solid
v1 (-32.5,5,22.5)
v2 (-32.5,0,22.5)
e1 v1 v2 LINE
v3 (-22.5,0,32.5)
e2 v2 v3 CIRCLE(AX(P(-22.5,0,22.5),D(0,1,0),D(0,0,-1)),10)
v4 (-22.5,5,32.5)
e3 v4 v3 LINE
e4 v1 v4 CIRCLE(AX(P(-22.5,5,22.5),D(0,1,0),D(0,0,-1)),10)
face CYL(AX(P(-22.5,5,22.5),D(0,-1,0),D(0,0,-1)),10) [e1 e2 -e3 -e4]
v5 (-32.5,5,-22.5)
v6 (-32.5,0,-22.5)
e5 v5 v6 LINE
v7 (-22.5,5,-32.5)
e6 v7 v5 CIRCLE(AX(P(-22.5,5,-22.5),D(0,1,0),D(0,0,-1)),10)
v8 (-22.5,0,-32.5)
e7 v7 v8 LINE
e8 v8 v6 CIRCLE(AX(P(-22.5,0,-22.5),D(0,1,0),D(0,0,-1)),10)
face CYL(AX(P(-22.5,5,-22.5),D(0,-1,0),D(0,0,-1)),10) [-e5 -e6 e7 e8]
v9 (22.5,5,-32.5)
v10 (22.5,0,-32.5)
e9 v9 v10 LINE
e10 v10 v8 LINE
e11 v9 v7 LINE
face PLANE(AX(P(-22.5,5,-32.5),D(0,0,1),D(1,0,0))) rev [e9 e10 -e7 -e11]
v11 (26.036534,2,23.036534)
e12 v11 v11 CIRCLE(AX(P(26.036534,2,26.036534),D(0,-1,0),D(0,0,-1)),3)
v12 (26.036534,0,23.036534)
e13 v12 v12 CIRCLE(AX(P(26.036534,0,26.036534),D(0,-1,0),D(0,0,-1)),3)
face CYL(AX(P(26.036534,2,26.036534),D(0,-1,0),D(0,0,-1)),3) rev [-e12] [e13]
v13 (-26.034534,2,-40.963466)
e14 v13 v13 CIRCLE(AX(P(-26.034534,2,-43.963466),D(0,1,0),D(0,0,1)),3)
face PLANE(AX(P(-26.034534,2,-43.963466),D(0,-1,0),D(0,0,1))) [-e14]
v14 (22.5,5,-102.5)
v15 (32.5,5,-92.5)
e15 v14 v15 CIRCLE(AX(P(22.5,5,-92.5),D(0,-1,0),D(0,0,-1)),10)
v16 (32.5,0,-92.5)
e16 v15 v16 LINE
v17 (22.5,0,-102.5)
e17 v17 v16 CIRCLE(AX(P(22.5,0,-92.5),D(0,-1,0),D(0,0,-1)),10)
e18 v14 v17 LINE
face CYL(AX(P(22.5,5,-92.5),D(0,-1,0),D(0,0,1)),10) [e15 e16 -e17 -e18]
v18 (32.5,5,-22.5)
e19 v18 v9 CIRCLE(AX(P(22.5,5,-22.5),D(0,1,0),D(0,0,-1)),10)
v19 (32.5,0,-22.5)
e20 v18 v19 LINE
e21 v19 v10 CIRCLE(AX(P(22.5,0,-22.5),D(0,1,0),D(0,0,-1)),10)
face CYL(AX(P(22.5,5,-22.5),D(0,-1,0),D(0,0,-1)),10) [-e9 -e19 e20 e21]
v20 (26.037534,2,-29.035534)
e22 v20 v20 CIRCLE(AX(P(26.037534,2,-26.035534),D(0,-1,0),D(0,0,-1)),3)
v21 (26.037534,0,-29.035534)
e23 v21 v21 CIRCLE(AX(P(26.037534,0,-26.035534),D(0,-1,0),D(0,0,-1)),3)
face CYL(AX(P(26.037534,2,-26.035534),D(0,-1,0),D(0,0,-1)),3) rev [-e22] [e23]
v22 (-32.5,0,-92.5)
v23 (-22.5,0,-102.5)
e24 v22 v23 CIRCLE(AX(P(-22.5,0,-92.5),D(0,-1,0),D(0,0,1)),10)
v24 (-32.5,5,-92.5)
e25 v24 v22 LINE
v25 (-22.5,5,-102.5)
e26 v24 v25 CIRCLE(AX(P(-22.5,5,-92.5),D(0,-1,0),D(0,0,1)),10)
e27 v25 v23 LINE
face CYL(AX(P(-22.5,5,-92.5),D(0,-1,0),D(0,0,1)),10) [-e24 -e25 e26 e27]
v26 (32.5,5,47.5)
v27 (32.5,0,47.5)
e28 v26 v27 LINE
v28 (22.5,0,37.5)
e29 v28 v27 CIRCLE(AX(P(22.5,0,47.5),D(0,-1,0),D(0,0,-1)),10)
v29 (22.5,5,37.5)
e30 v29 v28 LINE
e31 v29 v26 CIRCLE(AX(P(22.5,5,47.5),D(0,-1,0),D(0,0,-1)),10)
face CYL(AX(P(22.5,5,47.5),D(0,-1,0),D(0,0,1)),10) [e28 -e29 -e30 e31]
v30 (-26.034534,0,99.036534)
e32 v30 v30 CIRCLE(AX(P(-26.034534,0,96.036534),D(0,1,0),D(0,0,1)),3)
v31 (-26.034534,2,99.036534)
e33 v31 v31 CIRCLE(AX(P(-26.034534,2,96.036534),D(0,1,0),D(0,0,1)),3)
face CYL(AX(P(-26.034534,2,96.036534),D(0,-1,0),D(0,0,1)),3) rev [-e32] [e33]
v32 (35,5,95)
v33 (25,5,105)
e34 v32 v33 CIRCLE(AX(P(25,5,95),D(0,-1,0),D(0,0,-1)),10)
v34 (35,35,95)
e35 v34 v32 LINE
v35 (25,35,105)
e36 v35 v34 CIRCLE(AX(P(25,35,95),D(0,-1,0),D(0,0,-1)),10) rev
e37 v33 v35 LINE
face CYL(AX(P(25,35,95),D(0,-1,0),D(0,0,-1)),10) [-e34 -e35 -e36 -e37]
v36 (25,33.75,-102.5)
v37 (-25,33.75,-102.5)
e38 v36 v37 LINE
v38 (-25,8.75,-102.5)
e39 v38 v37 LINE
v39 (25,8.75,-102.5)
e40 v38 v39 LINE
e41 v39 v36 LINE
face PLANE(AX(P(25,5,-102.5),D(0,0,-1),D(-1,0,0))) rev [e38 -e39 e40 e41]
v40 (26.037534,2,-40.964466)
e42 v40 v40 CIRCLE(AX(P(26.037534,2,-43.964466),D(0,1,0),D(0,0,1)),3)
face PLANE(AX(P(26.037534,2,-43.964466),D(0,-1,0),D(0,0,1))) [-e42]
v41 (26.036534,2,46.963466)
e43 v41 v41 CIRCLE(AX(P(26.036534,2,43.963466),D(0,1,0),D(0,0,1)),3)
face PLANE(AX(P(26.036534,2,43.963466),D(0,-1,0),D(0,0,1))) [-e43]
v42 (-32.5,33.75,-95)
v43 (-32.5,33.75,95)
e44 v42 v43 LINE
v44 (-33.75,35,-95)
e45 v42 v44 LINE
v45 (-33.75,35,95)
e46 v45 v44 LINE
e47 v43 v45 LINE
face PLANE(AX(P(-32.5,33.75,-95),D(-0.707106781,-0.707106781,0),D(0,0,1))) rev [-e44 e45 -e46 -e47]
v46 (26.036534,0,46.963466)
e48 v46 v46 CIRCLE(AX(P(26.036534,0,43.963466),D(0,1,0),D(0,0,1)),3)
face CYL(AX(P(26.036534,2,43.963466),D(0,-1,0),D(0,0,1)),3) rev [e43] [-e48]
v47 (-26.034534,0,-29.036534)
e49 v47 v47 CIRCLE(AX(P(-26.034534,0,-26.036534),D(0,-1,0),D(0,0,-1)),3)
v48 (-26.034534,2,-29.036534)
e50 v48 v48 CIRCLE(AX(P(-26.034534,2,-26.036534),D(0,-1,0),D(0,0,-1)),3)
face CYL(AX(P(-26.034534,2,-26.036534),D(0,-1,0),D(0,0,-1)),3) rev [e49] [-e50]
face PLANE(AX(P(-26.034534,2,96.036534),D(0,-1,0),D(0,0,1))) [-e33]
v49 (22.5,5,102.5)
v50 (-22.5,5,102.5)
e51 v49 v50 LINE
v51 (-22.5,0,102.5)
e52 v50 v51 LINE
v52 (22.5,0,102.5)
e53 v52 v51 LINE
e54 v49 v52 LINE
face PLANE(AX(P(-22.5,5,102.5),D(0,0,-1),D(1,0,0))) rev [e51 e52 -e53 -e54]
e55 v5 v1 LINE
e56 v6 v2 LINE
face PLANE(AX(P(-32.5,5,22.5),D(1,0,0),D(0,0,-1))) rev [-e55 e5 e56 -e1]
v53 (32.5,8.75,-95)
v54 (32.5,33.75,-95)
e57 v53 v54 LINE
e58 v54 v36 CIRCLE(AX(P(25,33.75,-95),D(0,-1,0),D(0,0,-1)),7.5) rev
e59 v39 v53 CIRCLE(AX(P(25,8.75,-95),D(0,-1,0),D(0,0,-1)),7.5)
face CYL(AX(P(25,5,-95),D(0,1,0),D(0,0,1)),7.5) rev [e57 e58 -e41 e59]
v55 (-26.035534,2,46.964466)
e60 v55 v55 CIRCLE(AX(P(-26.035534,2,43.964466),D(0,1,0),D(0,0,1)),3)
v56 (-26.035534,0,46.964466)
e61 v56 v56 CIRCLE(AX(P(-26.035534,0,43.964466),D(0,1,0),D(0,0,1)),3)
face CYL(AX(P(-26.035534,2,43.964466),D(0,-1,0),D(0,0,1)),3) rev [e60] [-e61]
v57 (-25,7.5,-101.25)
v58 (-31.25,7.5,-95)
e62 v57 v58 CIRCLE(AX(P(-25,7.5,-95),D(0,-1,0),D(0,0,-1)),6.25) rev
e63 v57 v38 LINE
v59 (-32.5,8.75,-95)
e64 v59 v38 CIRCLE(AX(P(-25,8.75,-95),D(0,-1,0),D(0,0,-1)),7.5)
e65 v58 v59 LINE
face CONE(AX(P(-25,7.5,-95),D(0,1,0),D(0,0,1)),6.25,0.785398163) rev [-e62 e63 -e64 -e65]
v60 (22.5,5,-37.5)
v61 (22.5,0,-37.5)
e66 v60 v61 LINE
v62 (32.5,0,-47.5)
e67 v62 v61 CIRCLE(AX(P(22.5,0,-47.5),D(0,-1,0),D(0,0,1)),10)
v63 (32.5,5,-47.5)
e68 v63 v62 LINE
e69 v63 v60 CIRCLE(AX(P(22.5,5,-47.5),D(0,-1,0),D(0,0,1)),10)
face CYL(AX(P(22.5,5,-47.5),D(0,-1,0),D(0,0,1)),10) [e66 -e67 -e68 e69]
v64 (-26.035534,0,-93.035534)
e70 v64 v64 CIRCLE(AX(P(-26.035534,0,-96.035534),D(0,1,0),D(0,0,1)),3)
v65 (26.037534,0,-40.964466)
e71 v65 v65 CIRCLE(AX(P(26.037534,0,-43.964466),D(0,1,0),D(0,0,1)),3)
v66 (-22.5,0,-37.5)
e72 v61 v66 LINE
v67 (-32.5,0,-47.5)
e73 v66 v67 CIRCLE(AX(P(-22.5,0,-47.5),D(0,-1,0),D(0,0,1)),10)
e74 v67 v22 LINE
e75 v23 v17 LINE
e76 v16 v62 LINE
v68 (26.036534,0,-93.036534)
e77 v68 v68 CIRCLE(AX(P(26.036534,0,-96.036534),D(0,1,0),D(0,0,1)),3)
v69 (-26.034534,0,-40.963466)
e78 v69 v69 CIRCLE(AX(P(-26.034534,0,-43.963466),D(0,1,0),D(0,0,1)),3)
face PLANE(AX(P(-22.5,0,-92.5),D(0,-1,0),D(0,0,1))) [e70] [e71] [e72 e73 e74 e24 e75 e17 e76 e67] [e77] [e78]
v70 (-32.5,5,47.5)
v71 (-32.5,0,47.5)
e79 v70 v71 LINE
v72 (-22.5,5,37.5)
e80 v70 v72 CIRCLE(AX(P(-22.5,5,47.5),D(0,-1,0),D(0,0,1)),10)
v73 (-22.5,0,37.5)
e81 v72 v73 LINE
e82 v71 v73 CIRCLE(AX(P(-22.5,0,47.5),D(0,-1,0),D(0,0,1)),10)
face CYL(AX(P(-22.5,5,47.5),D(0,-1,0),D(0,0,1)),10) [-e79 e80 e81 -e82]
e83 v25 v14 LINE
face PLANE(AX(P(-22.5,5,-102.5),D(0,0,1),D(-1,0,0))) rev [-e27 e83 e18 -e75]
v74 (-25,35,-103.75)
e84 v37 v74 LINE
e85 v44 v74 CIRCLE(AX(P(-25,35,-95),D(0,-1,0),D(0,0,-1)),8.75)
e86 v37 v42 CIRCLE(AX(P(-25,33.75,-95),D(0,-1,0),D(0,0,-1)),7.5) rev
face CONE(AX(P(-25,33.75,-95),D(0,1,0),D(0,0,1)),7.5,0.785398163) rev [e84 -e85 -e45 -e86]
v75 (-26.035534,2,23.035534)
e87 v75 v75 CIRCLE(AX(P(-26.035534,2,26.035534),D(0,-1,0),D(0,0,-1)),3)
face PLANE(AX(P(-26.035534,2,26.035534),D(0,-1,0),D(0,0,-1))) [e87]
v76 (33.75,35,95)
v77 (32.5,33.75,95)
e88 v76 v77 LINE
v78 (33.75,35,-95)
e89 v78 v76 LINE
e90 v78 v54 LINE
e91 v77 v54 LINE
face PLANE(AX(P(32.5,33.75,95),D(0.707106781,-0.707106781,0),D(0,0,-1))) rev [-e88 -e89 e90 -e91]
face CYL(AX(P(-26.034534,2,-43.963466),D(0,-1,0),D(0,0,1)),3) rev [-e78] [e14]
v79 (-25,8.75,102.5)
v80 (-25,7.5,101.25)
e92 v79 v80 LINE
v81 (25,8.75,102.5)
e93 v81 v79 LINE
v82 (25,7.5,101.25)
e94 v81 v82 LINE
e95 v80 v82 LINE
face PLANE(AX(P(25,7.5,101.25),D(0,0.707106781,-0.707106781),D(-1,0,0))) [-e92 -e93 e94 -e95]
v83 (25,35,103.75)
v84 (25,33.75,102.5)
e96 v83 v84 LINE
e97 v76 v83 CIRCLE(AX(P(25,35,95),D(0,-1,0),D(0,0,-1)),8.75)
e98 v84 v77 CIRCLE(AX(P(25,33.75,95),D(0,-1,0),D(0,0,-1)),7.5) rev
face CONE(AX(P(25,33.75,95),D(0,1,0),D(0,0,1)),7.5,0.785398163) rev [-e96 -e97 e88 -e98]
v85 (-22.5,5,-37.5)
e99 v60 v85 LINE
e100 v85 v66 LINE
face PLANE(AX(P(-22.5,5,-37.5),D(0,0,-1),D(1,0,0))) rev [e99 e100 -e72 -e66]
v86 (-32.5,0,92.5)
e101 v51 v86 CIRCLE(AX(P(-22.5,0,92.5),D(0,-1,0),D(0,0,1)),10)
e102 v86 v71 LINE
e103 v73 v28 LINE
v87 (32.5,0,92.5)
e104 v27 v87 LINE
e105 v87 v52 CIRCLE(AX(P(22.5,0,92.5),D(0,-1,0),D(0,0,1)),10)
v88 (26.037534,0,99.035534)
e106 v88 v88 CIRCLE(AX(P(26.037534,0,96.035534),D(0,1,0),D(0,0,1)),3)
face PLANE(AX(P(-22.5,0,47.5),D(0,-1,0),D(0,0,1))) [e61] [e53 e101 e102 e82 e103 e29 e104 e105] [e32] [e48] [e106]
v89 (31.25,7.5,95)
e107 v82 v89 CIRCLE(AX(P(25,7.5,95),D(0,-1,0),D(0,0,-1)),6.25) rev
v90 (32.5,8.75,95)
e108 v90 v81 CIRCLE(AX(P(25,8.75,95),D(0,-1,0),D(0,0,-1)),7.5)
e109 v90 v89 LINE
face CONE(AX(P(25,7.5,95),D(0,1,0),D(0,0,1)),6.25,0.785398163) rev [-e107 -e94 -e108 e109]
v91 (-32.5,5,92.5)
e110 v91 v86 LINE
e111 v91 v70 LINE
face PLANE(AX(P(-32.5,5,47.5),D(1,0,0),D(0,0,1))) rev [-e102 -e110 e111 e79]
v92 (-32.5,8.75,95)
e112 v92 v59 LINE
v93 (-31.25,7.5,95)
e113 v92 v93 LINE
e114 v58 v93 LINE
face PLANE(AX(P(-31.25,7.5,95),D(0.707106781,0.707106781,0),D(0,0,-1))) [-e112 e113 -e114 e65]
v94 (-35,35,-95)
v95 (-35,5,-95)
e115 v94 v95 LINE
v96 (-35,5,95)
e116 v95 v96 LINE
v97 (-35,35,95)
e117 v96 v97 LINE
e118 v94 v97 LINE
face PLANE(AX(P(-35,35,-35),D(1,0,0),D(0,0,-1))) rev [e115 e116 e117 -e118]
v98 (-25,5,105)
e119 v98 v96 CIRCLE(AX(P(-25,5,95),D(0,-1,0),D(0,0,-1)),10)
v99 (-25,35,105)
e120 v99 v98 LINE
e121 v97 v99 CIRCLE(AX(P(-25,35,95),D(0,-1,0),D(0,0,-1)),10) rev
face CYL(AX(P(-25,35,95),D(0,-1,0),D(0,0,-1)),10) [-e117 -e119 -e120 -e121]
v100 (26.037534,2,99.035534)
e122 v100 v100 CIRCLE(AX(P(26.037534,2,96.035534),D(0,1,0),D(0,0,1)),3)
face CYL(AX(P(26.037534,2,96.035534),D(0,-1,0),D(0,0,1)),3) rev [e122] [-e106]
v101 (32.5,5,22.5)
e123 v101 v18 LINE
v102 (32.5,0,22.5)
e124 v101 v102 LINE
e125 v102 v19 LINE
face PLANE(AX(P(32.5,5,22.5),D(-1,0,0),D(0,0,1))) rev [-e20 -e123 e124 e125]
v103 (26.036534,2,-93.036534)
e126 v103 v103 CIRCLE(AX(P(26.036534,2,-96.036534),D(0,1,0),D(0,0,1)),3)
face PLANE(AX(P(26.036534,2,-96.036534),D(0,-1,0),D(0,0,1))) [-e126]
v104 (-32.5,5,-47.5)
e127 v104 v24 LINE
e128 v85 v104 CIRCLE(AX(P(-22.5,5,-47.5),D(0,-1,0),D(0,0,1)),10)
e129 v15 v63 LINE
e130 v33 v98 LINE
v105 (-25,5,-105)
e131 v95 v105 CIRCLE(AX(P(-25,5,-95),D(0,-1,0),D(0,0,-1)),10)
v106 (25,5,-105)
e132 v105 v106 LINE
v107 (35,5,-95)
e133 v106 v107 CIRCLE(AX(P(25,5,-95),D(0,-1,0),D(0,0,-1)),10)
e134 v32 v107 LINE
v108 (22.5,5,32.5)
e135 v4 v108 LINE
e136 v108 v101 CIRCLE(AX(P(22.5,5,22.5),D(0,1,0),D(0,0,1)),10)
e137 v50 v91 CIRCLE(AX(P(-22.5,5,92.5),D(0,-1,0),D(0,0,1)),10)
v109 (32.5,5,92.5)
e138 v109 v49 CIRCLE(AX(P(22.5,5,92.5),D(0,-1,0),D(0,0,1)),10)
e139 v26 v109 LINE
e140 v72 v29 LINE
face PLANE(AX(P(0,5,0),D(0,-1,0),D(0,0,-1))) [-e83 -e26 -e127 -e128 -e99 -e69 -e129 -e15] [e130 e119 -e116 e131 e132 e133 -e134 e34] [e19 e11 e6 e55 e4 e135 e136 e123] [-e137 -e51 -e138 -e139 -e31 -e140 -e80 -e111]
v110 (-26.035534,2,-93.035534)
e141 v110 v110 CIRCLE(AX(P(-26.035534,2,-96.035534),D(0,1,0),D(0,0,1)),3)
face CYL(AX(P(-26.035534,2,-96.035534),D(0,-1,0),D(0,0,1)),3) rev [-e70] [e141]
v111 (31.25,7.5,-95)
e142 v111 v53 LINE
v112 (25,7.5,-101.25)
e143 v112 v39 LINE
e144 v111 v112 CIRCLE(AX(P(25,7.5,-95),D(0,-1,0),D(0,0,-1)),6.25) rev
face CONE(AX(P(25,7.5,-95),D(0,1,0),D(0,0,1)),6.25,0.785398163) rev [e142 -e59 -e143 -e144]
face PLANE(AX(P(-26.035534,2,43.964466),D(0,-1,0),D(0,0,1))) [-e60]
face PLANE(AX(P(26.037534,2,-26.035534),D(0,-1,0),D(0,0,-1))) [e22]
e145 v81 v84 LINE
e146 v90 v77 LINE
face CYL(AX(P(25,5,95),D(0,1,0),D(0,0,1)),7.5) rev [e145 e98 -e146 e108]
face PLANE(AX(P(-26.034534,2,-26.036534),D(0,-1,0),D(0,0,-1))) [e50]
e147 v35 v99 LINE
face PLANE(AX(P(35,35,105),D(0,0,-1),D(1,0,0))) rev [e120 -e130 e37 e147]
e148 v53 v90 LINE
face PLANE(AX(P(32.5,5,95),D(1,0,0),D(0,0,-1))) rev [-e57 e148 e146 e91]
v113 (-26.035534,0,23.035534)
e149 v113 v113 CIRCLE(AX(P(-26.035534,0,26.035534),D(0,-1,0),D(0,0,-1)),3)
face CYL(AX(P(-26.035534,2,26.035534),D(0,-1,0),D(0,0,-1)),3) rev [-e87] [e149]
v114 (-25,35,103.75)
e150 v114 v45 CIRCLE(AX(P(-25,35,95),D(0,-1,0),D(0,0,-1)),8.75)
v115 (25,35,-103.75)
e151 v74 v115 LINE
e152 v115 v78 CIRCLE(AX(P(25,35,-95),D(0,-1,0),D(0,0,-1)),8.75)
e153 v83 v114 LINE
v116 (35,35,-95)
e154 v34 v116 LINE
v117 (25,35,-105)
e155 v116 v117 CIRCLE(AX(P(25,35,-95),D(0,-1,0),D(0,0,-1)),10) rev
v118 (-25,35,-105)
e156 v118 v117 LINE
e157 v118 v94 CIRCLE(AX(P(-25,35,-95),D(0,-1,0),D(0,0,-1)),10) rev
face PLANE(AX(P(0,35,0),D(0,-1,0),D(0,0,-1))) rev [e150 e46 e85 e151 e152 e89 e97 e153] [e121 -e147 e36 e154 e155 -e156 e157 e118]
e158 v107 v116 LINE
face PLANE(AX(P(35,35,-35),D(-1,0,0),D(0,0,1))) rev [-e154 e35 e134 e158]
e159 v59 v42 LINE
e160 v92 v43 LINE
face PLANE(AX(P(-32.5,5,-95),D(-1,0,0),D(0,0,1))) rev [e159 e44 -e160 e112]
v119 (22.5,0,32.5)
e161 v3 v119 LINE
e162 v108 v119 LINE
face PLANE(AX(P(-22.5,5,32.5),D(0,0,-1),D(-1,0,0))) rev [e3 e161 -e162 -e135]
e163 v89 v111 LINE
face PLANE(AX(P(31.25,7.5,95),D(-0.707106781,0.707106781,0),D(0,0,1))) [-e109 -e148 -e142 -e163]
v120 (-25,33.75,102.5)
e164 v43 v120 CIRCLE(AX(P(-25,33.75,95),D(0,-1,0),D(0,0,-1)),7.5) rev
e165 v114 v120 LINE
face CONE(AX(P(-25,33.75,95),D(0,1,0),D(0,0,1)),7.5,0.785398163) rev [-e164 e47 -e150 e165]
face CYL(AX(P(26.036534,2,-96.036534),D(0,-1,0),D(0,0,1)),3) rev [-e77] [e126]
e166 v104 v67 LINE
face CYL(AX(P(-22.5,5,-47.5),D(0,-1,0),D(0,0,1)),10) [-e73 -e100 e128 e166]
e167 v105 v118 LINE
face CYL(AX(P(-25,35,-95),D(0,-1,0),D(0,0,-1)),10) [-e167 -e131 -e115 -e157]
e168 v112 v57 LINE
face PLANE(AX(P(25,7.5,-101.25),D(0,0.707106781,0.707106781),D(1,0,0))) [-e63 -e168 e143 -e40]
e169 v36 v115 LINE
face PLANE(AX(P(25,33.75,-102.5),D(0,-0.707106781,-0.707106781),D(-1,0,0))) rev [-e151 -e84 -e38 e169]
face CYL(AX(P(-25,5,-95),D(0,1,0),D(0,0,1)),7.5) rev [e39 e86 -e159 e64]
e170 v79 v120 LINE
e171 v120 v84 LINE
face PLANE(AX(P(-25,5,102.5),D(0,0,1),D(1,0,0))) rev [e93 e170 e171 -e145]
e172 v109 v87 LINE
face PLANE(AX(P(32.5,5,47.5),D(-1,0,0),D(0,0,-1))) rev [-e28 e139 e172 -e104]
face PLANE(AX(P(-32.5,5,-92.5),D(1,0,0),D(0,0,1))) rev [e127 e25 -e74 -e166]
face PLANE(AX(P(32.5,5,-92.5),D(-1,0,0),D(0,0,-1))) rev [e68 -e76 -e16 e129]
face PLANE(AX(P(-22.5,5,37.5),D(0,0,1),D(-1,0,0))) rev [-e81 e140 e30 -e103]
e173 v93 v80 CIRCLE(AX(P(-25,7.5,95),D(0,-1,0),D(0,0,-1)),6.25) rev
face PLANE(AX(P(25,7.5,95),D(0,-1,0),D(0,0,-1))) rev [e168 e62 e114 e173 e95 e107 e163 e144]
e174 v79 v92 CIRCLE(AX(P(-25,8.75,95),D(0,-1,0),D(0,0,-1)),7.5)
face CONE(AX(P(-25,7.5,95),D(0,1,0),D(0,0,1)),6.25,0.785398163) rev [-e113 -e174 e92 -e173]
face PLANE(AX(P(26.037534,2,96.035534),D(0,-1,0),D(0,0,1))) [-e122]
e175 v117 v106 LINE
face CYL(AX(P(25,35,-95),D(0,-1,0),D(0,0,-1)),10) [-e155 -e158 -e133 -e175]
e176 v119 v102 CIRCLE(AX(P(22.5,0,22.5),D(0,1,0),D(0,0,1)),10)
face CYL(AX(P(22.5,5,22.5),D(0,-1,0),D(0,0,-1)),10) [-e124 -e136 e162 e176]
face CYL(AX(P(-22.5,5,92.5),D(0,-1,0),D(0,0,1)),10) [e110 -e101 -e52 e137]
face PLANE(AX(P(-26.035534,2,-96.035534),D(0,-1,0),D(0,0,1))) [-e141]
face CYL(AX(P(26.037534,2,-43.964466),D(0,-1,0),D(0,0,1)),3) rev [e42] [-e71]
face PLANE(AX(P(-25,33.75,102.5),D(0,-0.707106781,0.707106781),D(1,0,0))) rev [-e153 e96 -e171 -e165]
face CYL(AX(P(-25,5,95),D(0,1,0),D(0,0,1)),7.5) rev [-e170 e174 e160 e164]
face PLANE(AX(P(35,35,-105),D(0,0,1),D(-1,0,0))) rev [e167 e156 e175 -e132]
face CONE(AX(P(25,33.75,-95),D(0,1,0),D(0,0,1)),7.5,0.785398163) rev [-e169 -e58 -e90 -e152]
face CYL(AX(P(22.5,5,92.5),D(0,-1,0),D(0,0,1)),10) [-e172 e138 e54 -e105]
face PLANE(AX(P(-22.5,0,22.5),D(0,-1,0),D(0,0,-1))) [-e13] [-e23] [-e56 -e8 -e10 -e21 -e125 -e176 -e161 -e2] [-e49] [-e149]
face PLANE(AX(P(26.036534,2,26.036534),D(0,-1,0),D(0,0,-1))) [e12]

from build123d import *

# Parameters (mm, degrees)
BOSS_EXTRUDE4_DEPTH = 5
SKETCH7_R           = 3
CUT_EXTRUDE4_DEPTH  = 2
SKETCH8_W           = 70
SKETCH8_H           = 70
BOSS_EXTRUDE5_DEPTH = 30
MIRROR2_START       = 5
MIRROR2_OUTLINE_W   = 70
MIRROR2_OUTLINE_H   = 70
MIRROR2_DEPTH       = 30
MIRROR2_2_OUTLINE_R = 3
MIRROR2_2_DEPTH     = 5
MIRROR2_START_2     = 2
MIRROR2_3_OUTLINE_R = 3
MIRROR2_3_DEPTH     = 3
FILLET1_R           = 10
CUT_EXTRUDE5_DEPTH  = 30
BOSS_EXTRUDE6_DEPTH = 2.5
CHAMFER1_SIZE       = 1.25


# Read off the part's stored shape, not the designer's step: Mirror2
with BuildPart() as part:
    # Sketch5 → Boss-Extrude4 (new body)
    with BuildSketch(Plane(origin=(0, 0, 0), x_dir=(1, 0, 0), z_dir=(0, 1, 0))):
        with BuildLine():
            Line((-22.5, -32.5), (22.5, -32.5))
            ThreePointArc((22.5, -32.5), (29.571067812, -29.571067812), (32.5, -22.5))
            Line((32.5, -22.5), (32.5, 22.5))
            ThreePointArc((32.5, 22.5), (29.571067812, 29.571067812), (22.5, 32.5))
            Line((22.5, 32.5), (-22.5, 32.5))
            ThreePointArc((-22.5, 32.5), (-29.571067812, 29.571067812), (-32.5, 22.5))
            Line((-32.5, 22.5), (-32.5, -22.5))
            ThreePointArc((-32.5, -22.5), (-29.571067812, -29.571067812), (-22.5, -32.5))
        make_face()
    extrude(amount=BOSS_EXTRUDE4_DEPTH)

    # Sketch7 → Cut-Extrude4 (cut)
    with BuildSketch(Plane.XZ):
        with Locations(Location((-26.035533906, 26.035533906, 0), (0, 0, 270))):
            Circle(SKETCH7_R)
        with Locations(Location((26.036533906, 26.036533906, 0), (0, 0, 270))):
            Circle(SKETCH7_R)
        with Locations(Location((26.037533906, -26.035533906, 0), (0, 0, 270))):
            Circle(SKETCH7_R)
        with Locations(Location((-26.034533906, -26.036533906, 0), (0, 0, 270))):
            Circle(SKETCH7_R)
    extrude(amount=-CUT_EXTRUDE4_DEPTH, mode=Mode.SUBTRACT)

    # Sketch8 → Boss-Extrude5 (add)
    with BuildSketch(Plane(origin=(0, 5, 0), x_dir=(1, 0, 0), z_dir=(0, 1, 0))):
        Rectangle(SKETCH8_W, SKETCH8_H)
    extrude(amount=BOSS_EXTRUDE5_DEPTH)

    # Mirror2 outline → Mirror2 (add)
    with BuildSketch(Plane(origin=(0, 0, 0), x_dir=(1, 0, 0), z_dir=(0, 1, 0)).offset(MIRROR2_START)):
        with Locations((0, -70)):
            Rectangle(MIRROR2_OUTLINE_W, MIRROR2_OUTLINE_H)
        with Locations((0, 70)):
            Rectangle(MIRROR2_OUTLINE_W, MIRROR2_OUTLINE_H)
    extrude(amount=MIRROR2_DEPTH)

    # Mirror2 2 outline → Mirror2 2 (add)
    # profile 1 of 2: a face of its own
    with BuildSketch(Plane(origin=(0, 0, 0), x_dir=(1, 0, 0), z_dir=(0, 1, 0))):
        with BuildLine():
            Line((32.5, -92.5), (32.5, -47.5))
            ThreePointArc((32.5, -47.5), (29.571067812, -40.428932188), (22.5, -37.5))
            Line((22.5, -37.5), (-22.5, -37.5))
            ThreePointArc((-22.5, -37.5), (-29.571067812, -40.428932188), (-32.5, -47.5))
            Line((-32.5, -47.5), (-32.5, -92.5))
            ThreePointArc((-32.5, -92.5), (-29.571067812, -99.571067812), (-22.5, -102.5))
            Line((-22.5, -102.5), (22.5, -102.5))
            ThreePointArc((22.5, -102.5), (29.571067812, -99.571067812), (32.5, -92.5))
        make_face()
        with Locations((-26.034533906, -96.036533906)):
            Circle(MIRROR2_2_OUTLINE_R, mode=Mode.SUBTRACT)
        with Locations((-26.035533906, -43.964466094)):
            Circle(MIRROR2_2_OUTLINE_R, mode=Mode.SUBTRACT)
        with Locations((26.037533906, -96.035533906)):
            Circle(MIRROR2_2_OUTLINE_R, mode=Mode.SUBTRACT)
        with Locations((26.036533906, -43.963466094)):
            Circle(MIRROR2_2_OUTLINE_R, mode=Mode.SUBTRACT)
    # profile 2 of 2: a face of its own
    with BuildSketch(Plane(origin=(0, 0, 0), x_dir=(1, 0, 0), z_dir=(0, 1, 0))):
        with BuildLine():
            Line((32.5, 47.5), (32.5, 92.5))
            ThreePointArc((32.5, 92.5), (29.571067812, 99.571067812), (22.5, 102.5))
            Line((22.5, 102.5), (-22.5, 102.5))
            ThreePointArc((-22.5, 102.5), (-29.571067812, 99.571067812), (-32.5, 92.5))
            Line((-32.5, 92.5), (-32.5, 47.5))
            ThreePointArc((-32.5, 47.5), (-29.571067812, 40.428932188), (-22.5, 37.5))
            Line((-22.5, 37.5), (22.5, 37.5))
            ThreePointArc((22.5, 37.5), (29.571067812, 40.428932188), (32.5, 47.5))
        make_face()
        with Locations((-26.034533906, 43.963466094)):
            Circle(MIRROR2_2_OUTLINE_R, mode=Mode.SUBTRACT)
        with Locations((-26.035533906, 96.035533906)):
            Circle(MIRROR2_2_OUTLINE_R, mode=Mode.SUBTRACT)
        with Locations((26.037533906, 43.964466094)):
            Circle(MIRROR2_2_OUTLINE_R, mode=Mode.SUBTRACT)
        with Locations((26.036533906, 96.036533906)):
            Circle(MIRROR2_2_OUTLINE_R, mode=Mode.SUBTRACT)
    extrude(amount=MIRROR2_2_DEPTH)

    # Mirror2 3 outline → Mirror2 3 (add)
    with BuildSketch(Plane(origin=(0, 0, 0), x_dir=(1, 0, 0), z_dir=(0, 1, 0)).offset(MIRROR2_START_2)):
        with Locations((-26.035533906, -43.964466094)):
            Circle(MIRROR2_3_OUTLINE_R)
        with Locations((26.036533906, -43.963466094)):
            Circle(MIRROR2_3_OUTLINE_R)
        with Locations((26.037533906, -96.035533906)):
            Circle(MIRROR2_3_OUTLINE_R)
        with Locations((-26.034533906, -96.036533906)):
            Circle(MIRROR2_3_OUTLINE_R)
        with Locations((-26.035533906, 96.035533906)):
            Circle(MIRROR2_3_OUTLINE_R)
        with Locations((26.036533906, 96.036533906)):
            Circle(MIRROR2_3_OUTLINE_R)
        with Locations((26.037533906, 43.964466094)):
            Circle(MIRROR2_3_OUTLINE_R)
        with Locations((-26.034533906, 43.963466094)):
            Circle(MIRROR2_3_OUTLINE_R)
    extrude(amount=MIRROR2_3_DEPTH)

    # Fillet1
    fillet1_edges = [part.edges().sort_by_distance(p)[0] for p in [
        (35, 20, 105),
        (-35, 20, 105),
        (-35, 20, -105),
        (35, 20, -105),
    ]]
    fillet(fillet1_edges, radius=FILLET1_R)

    # Sketch9 → Cut-Extrude5 (cut)
    with BuildSketch(Plane(origin=(0, 35, 0), x_dir=(1, 0, 0), z_dir=(0, 1, 0))):
        with BuildLine():
            Line((-32.5, 95), (-32.5, -95))
            ThreePointArc((-32.5, -95), (-30.303300859, -100.303300859), (-25, -102.5))
            Line((-25, -102.5), (25, -102.5))
            ThreePointArc((25, -102.5), (30.303300859, -100.303300859), (32.5, -95))
            Line((32.5, -95), (32.5, 95))
            ThreePointArc((32.5, 95), (30.303300859, 100.303300859), (25, 102.5))
            Line((25, 102.5), (-25, 102.5))
            ThreePointArc((-25, 102.5), (-30.303300859, 100.303300859), (-32.5, 95))
        make_face()
    extrude(amount=-CUT_EXTRUDE5_DEPTH, mode=Mode.SUBTRACT)


with BuildPart() as cut_extrude5_piece_1:
    # of the separate pieces the step leaves, piece 1, a body of its own (cut_extrude5_pieces)
    add(part.part.solids().sort_by_distance((35, 5, 95))[0])



with BuildPart() as cut_extrude5_piece_2:
    # of the separate pieces the step leaves, piece 2, a body of its own (cut_extrude5_pieces)
    add(part.part.solids().sort_by_distance((32.5, 0, 92.5))[0])


with BuildPart() as cut_extrude5_piece_3:
    # of the separate pieces the step leaves, piece 3, a body of its own (cut_extrude5_pieces)
    add(part.part.solids().sort_by_distance((32.5, 0, -47.5))[0])


with BuildPart() as cut_extrude5_piece_4:
    # of the separate pieces the step leaves, piece 4, a body of its own (cut_extrude5_pieces)
    add(part.part.solids().sort_by_distance((32.5, 0, 22.5))[0])


with BuildPart() as cut_extrude5_piece_1_1:
    add(cut_extrude5_piece_1.part)

    add(cut_extrude5_piece_2.part)  # Boss-Extrude6 merges Cut-Extrude5 piece 2

    add(cut_extrude5_piece_3.part)  # Boss-Extrude6 merges Cut-Extrude5 piece 3

    add(cut_extrude5_piece_4.part)  # Boss-Extrude6 merges Cut-Extrude5 piece 4
    # Sketch10 → Boss-Extrude6 (add)
    with BuildSketch(Plane.XZ.offset(-5)):
        with BuildLine():
            Line((25, 105), (-25, 105))
            ThreePointArc((-25, 105), (-32.071067812, 102.071067812), (-35, 95))
            Line((-35, 95), (-35, -95))
            ThreePointArc((-35, -95), (-32.071067812, -102.071067812), (-25, -105))
            Line((-25, -105), (25, -105))
            ThreePointArc((25, -105), (32.071067812, -102.071067812), (35, -95))
            Line((35, -95), (35, 95))
            ThreePointArc((35, 95), (32.071067812, 102.071067812), (25, 105))
        make_face()
    extrude(amount=-BOSS_EXTRUDE6_DEPTH)

    # Chamfer1
    chamfer1_edges = [cut_extrude5_piece_1_1.edges().sort_by_distance(p)[0] for p in [
        (0, 35, 102.5),
        (-32.5, 35, 0),
        (-30.303300859, 35, 100.303300859),
        (30.303300859, 35, 100.303300859),
        (30.303300859, 35, -100.303300859),
        (-30.303300859, 35, -100.303300859),
        (-30.303300859, 7.5, -100.303300859),
        (0, 7.5, 102.5),
        (30.303300859, 7.5, 100.303300859),
        (32.5, 7.5, 0),
        (30.303300859, 7.5, -100.303300859),
        (0, 7.5, -102.5),
        (-32.5, 7.5, 0),
        (-30.303300859, 7.5, 100.303300859),
        (0, 35, -102.5),
        (32.5, 35, 0),
    ]]
    chamfer(chamfer1_edges, length=CHAMFER1_SIZE)


solid = cut_extrude5_piece_1_1.part
